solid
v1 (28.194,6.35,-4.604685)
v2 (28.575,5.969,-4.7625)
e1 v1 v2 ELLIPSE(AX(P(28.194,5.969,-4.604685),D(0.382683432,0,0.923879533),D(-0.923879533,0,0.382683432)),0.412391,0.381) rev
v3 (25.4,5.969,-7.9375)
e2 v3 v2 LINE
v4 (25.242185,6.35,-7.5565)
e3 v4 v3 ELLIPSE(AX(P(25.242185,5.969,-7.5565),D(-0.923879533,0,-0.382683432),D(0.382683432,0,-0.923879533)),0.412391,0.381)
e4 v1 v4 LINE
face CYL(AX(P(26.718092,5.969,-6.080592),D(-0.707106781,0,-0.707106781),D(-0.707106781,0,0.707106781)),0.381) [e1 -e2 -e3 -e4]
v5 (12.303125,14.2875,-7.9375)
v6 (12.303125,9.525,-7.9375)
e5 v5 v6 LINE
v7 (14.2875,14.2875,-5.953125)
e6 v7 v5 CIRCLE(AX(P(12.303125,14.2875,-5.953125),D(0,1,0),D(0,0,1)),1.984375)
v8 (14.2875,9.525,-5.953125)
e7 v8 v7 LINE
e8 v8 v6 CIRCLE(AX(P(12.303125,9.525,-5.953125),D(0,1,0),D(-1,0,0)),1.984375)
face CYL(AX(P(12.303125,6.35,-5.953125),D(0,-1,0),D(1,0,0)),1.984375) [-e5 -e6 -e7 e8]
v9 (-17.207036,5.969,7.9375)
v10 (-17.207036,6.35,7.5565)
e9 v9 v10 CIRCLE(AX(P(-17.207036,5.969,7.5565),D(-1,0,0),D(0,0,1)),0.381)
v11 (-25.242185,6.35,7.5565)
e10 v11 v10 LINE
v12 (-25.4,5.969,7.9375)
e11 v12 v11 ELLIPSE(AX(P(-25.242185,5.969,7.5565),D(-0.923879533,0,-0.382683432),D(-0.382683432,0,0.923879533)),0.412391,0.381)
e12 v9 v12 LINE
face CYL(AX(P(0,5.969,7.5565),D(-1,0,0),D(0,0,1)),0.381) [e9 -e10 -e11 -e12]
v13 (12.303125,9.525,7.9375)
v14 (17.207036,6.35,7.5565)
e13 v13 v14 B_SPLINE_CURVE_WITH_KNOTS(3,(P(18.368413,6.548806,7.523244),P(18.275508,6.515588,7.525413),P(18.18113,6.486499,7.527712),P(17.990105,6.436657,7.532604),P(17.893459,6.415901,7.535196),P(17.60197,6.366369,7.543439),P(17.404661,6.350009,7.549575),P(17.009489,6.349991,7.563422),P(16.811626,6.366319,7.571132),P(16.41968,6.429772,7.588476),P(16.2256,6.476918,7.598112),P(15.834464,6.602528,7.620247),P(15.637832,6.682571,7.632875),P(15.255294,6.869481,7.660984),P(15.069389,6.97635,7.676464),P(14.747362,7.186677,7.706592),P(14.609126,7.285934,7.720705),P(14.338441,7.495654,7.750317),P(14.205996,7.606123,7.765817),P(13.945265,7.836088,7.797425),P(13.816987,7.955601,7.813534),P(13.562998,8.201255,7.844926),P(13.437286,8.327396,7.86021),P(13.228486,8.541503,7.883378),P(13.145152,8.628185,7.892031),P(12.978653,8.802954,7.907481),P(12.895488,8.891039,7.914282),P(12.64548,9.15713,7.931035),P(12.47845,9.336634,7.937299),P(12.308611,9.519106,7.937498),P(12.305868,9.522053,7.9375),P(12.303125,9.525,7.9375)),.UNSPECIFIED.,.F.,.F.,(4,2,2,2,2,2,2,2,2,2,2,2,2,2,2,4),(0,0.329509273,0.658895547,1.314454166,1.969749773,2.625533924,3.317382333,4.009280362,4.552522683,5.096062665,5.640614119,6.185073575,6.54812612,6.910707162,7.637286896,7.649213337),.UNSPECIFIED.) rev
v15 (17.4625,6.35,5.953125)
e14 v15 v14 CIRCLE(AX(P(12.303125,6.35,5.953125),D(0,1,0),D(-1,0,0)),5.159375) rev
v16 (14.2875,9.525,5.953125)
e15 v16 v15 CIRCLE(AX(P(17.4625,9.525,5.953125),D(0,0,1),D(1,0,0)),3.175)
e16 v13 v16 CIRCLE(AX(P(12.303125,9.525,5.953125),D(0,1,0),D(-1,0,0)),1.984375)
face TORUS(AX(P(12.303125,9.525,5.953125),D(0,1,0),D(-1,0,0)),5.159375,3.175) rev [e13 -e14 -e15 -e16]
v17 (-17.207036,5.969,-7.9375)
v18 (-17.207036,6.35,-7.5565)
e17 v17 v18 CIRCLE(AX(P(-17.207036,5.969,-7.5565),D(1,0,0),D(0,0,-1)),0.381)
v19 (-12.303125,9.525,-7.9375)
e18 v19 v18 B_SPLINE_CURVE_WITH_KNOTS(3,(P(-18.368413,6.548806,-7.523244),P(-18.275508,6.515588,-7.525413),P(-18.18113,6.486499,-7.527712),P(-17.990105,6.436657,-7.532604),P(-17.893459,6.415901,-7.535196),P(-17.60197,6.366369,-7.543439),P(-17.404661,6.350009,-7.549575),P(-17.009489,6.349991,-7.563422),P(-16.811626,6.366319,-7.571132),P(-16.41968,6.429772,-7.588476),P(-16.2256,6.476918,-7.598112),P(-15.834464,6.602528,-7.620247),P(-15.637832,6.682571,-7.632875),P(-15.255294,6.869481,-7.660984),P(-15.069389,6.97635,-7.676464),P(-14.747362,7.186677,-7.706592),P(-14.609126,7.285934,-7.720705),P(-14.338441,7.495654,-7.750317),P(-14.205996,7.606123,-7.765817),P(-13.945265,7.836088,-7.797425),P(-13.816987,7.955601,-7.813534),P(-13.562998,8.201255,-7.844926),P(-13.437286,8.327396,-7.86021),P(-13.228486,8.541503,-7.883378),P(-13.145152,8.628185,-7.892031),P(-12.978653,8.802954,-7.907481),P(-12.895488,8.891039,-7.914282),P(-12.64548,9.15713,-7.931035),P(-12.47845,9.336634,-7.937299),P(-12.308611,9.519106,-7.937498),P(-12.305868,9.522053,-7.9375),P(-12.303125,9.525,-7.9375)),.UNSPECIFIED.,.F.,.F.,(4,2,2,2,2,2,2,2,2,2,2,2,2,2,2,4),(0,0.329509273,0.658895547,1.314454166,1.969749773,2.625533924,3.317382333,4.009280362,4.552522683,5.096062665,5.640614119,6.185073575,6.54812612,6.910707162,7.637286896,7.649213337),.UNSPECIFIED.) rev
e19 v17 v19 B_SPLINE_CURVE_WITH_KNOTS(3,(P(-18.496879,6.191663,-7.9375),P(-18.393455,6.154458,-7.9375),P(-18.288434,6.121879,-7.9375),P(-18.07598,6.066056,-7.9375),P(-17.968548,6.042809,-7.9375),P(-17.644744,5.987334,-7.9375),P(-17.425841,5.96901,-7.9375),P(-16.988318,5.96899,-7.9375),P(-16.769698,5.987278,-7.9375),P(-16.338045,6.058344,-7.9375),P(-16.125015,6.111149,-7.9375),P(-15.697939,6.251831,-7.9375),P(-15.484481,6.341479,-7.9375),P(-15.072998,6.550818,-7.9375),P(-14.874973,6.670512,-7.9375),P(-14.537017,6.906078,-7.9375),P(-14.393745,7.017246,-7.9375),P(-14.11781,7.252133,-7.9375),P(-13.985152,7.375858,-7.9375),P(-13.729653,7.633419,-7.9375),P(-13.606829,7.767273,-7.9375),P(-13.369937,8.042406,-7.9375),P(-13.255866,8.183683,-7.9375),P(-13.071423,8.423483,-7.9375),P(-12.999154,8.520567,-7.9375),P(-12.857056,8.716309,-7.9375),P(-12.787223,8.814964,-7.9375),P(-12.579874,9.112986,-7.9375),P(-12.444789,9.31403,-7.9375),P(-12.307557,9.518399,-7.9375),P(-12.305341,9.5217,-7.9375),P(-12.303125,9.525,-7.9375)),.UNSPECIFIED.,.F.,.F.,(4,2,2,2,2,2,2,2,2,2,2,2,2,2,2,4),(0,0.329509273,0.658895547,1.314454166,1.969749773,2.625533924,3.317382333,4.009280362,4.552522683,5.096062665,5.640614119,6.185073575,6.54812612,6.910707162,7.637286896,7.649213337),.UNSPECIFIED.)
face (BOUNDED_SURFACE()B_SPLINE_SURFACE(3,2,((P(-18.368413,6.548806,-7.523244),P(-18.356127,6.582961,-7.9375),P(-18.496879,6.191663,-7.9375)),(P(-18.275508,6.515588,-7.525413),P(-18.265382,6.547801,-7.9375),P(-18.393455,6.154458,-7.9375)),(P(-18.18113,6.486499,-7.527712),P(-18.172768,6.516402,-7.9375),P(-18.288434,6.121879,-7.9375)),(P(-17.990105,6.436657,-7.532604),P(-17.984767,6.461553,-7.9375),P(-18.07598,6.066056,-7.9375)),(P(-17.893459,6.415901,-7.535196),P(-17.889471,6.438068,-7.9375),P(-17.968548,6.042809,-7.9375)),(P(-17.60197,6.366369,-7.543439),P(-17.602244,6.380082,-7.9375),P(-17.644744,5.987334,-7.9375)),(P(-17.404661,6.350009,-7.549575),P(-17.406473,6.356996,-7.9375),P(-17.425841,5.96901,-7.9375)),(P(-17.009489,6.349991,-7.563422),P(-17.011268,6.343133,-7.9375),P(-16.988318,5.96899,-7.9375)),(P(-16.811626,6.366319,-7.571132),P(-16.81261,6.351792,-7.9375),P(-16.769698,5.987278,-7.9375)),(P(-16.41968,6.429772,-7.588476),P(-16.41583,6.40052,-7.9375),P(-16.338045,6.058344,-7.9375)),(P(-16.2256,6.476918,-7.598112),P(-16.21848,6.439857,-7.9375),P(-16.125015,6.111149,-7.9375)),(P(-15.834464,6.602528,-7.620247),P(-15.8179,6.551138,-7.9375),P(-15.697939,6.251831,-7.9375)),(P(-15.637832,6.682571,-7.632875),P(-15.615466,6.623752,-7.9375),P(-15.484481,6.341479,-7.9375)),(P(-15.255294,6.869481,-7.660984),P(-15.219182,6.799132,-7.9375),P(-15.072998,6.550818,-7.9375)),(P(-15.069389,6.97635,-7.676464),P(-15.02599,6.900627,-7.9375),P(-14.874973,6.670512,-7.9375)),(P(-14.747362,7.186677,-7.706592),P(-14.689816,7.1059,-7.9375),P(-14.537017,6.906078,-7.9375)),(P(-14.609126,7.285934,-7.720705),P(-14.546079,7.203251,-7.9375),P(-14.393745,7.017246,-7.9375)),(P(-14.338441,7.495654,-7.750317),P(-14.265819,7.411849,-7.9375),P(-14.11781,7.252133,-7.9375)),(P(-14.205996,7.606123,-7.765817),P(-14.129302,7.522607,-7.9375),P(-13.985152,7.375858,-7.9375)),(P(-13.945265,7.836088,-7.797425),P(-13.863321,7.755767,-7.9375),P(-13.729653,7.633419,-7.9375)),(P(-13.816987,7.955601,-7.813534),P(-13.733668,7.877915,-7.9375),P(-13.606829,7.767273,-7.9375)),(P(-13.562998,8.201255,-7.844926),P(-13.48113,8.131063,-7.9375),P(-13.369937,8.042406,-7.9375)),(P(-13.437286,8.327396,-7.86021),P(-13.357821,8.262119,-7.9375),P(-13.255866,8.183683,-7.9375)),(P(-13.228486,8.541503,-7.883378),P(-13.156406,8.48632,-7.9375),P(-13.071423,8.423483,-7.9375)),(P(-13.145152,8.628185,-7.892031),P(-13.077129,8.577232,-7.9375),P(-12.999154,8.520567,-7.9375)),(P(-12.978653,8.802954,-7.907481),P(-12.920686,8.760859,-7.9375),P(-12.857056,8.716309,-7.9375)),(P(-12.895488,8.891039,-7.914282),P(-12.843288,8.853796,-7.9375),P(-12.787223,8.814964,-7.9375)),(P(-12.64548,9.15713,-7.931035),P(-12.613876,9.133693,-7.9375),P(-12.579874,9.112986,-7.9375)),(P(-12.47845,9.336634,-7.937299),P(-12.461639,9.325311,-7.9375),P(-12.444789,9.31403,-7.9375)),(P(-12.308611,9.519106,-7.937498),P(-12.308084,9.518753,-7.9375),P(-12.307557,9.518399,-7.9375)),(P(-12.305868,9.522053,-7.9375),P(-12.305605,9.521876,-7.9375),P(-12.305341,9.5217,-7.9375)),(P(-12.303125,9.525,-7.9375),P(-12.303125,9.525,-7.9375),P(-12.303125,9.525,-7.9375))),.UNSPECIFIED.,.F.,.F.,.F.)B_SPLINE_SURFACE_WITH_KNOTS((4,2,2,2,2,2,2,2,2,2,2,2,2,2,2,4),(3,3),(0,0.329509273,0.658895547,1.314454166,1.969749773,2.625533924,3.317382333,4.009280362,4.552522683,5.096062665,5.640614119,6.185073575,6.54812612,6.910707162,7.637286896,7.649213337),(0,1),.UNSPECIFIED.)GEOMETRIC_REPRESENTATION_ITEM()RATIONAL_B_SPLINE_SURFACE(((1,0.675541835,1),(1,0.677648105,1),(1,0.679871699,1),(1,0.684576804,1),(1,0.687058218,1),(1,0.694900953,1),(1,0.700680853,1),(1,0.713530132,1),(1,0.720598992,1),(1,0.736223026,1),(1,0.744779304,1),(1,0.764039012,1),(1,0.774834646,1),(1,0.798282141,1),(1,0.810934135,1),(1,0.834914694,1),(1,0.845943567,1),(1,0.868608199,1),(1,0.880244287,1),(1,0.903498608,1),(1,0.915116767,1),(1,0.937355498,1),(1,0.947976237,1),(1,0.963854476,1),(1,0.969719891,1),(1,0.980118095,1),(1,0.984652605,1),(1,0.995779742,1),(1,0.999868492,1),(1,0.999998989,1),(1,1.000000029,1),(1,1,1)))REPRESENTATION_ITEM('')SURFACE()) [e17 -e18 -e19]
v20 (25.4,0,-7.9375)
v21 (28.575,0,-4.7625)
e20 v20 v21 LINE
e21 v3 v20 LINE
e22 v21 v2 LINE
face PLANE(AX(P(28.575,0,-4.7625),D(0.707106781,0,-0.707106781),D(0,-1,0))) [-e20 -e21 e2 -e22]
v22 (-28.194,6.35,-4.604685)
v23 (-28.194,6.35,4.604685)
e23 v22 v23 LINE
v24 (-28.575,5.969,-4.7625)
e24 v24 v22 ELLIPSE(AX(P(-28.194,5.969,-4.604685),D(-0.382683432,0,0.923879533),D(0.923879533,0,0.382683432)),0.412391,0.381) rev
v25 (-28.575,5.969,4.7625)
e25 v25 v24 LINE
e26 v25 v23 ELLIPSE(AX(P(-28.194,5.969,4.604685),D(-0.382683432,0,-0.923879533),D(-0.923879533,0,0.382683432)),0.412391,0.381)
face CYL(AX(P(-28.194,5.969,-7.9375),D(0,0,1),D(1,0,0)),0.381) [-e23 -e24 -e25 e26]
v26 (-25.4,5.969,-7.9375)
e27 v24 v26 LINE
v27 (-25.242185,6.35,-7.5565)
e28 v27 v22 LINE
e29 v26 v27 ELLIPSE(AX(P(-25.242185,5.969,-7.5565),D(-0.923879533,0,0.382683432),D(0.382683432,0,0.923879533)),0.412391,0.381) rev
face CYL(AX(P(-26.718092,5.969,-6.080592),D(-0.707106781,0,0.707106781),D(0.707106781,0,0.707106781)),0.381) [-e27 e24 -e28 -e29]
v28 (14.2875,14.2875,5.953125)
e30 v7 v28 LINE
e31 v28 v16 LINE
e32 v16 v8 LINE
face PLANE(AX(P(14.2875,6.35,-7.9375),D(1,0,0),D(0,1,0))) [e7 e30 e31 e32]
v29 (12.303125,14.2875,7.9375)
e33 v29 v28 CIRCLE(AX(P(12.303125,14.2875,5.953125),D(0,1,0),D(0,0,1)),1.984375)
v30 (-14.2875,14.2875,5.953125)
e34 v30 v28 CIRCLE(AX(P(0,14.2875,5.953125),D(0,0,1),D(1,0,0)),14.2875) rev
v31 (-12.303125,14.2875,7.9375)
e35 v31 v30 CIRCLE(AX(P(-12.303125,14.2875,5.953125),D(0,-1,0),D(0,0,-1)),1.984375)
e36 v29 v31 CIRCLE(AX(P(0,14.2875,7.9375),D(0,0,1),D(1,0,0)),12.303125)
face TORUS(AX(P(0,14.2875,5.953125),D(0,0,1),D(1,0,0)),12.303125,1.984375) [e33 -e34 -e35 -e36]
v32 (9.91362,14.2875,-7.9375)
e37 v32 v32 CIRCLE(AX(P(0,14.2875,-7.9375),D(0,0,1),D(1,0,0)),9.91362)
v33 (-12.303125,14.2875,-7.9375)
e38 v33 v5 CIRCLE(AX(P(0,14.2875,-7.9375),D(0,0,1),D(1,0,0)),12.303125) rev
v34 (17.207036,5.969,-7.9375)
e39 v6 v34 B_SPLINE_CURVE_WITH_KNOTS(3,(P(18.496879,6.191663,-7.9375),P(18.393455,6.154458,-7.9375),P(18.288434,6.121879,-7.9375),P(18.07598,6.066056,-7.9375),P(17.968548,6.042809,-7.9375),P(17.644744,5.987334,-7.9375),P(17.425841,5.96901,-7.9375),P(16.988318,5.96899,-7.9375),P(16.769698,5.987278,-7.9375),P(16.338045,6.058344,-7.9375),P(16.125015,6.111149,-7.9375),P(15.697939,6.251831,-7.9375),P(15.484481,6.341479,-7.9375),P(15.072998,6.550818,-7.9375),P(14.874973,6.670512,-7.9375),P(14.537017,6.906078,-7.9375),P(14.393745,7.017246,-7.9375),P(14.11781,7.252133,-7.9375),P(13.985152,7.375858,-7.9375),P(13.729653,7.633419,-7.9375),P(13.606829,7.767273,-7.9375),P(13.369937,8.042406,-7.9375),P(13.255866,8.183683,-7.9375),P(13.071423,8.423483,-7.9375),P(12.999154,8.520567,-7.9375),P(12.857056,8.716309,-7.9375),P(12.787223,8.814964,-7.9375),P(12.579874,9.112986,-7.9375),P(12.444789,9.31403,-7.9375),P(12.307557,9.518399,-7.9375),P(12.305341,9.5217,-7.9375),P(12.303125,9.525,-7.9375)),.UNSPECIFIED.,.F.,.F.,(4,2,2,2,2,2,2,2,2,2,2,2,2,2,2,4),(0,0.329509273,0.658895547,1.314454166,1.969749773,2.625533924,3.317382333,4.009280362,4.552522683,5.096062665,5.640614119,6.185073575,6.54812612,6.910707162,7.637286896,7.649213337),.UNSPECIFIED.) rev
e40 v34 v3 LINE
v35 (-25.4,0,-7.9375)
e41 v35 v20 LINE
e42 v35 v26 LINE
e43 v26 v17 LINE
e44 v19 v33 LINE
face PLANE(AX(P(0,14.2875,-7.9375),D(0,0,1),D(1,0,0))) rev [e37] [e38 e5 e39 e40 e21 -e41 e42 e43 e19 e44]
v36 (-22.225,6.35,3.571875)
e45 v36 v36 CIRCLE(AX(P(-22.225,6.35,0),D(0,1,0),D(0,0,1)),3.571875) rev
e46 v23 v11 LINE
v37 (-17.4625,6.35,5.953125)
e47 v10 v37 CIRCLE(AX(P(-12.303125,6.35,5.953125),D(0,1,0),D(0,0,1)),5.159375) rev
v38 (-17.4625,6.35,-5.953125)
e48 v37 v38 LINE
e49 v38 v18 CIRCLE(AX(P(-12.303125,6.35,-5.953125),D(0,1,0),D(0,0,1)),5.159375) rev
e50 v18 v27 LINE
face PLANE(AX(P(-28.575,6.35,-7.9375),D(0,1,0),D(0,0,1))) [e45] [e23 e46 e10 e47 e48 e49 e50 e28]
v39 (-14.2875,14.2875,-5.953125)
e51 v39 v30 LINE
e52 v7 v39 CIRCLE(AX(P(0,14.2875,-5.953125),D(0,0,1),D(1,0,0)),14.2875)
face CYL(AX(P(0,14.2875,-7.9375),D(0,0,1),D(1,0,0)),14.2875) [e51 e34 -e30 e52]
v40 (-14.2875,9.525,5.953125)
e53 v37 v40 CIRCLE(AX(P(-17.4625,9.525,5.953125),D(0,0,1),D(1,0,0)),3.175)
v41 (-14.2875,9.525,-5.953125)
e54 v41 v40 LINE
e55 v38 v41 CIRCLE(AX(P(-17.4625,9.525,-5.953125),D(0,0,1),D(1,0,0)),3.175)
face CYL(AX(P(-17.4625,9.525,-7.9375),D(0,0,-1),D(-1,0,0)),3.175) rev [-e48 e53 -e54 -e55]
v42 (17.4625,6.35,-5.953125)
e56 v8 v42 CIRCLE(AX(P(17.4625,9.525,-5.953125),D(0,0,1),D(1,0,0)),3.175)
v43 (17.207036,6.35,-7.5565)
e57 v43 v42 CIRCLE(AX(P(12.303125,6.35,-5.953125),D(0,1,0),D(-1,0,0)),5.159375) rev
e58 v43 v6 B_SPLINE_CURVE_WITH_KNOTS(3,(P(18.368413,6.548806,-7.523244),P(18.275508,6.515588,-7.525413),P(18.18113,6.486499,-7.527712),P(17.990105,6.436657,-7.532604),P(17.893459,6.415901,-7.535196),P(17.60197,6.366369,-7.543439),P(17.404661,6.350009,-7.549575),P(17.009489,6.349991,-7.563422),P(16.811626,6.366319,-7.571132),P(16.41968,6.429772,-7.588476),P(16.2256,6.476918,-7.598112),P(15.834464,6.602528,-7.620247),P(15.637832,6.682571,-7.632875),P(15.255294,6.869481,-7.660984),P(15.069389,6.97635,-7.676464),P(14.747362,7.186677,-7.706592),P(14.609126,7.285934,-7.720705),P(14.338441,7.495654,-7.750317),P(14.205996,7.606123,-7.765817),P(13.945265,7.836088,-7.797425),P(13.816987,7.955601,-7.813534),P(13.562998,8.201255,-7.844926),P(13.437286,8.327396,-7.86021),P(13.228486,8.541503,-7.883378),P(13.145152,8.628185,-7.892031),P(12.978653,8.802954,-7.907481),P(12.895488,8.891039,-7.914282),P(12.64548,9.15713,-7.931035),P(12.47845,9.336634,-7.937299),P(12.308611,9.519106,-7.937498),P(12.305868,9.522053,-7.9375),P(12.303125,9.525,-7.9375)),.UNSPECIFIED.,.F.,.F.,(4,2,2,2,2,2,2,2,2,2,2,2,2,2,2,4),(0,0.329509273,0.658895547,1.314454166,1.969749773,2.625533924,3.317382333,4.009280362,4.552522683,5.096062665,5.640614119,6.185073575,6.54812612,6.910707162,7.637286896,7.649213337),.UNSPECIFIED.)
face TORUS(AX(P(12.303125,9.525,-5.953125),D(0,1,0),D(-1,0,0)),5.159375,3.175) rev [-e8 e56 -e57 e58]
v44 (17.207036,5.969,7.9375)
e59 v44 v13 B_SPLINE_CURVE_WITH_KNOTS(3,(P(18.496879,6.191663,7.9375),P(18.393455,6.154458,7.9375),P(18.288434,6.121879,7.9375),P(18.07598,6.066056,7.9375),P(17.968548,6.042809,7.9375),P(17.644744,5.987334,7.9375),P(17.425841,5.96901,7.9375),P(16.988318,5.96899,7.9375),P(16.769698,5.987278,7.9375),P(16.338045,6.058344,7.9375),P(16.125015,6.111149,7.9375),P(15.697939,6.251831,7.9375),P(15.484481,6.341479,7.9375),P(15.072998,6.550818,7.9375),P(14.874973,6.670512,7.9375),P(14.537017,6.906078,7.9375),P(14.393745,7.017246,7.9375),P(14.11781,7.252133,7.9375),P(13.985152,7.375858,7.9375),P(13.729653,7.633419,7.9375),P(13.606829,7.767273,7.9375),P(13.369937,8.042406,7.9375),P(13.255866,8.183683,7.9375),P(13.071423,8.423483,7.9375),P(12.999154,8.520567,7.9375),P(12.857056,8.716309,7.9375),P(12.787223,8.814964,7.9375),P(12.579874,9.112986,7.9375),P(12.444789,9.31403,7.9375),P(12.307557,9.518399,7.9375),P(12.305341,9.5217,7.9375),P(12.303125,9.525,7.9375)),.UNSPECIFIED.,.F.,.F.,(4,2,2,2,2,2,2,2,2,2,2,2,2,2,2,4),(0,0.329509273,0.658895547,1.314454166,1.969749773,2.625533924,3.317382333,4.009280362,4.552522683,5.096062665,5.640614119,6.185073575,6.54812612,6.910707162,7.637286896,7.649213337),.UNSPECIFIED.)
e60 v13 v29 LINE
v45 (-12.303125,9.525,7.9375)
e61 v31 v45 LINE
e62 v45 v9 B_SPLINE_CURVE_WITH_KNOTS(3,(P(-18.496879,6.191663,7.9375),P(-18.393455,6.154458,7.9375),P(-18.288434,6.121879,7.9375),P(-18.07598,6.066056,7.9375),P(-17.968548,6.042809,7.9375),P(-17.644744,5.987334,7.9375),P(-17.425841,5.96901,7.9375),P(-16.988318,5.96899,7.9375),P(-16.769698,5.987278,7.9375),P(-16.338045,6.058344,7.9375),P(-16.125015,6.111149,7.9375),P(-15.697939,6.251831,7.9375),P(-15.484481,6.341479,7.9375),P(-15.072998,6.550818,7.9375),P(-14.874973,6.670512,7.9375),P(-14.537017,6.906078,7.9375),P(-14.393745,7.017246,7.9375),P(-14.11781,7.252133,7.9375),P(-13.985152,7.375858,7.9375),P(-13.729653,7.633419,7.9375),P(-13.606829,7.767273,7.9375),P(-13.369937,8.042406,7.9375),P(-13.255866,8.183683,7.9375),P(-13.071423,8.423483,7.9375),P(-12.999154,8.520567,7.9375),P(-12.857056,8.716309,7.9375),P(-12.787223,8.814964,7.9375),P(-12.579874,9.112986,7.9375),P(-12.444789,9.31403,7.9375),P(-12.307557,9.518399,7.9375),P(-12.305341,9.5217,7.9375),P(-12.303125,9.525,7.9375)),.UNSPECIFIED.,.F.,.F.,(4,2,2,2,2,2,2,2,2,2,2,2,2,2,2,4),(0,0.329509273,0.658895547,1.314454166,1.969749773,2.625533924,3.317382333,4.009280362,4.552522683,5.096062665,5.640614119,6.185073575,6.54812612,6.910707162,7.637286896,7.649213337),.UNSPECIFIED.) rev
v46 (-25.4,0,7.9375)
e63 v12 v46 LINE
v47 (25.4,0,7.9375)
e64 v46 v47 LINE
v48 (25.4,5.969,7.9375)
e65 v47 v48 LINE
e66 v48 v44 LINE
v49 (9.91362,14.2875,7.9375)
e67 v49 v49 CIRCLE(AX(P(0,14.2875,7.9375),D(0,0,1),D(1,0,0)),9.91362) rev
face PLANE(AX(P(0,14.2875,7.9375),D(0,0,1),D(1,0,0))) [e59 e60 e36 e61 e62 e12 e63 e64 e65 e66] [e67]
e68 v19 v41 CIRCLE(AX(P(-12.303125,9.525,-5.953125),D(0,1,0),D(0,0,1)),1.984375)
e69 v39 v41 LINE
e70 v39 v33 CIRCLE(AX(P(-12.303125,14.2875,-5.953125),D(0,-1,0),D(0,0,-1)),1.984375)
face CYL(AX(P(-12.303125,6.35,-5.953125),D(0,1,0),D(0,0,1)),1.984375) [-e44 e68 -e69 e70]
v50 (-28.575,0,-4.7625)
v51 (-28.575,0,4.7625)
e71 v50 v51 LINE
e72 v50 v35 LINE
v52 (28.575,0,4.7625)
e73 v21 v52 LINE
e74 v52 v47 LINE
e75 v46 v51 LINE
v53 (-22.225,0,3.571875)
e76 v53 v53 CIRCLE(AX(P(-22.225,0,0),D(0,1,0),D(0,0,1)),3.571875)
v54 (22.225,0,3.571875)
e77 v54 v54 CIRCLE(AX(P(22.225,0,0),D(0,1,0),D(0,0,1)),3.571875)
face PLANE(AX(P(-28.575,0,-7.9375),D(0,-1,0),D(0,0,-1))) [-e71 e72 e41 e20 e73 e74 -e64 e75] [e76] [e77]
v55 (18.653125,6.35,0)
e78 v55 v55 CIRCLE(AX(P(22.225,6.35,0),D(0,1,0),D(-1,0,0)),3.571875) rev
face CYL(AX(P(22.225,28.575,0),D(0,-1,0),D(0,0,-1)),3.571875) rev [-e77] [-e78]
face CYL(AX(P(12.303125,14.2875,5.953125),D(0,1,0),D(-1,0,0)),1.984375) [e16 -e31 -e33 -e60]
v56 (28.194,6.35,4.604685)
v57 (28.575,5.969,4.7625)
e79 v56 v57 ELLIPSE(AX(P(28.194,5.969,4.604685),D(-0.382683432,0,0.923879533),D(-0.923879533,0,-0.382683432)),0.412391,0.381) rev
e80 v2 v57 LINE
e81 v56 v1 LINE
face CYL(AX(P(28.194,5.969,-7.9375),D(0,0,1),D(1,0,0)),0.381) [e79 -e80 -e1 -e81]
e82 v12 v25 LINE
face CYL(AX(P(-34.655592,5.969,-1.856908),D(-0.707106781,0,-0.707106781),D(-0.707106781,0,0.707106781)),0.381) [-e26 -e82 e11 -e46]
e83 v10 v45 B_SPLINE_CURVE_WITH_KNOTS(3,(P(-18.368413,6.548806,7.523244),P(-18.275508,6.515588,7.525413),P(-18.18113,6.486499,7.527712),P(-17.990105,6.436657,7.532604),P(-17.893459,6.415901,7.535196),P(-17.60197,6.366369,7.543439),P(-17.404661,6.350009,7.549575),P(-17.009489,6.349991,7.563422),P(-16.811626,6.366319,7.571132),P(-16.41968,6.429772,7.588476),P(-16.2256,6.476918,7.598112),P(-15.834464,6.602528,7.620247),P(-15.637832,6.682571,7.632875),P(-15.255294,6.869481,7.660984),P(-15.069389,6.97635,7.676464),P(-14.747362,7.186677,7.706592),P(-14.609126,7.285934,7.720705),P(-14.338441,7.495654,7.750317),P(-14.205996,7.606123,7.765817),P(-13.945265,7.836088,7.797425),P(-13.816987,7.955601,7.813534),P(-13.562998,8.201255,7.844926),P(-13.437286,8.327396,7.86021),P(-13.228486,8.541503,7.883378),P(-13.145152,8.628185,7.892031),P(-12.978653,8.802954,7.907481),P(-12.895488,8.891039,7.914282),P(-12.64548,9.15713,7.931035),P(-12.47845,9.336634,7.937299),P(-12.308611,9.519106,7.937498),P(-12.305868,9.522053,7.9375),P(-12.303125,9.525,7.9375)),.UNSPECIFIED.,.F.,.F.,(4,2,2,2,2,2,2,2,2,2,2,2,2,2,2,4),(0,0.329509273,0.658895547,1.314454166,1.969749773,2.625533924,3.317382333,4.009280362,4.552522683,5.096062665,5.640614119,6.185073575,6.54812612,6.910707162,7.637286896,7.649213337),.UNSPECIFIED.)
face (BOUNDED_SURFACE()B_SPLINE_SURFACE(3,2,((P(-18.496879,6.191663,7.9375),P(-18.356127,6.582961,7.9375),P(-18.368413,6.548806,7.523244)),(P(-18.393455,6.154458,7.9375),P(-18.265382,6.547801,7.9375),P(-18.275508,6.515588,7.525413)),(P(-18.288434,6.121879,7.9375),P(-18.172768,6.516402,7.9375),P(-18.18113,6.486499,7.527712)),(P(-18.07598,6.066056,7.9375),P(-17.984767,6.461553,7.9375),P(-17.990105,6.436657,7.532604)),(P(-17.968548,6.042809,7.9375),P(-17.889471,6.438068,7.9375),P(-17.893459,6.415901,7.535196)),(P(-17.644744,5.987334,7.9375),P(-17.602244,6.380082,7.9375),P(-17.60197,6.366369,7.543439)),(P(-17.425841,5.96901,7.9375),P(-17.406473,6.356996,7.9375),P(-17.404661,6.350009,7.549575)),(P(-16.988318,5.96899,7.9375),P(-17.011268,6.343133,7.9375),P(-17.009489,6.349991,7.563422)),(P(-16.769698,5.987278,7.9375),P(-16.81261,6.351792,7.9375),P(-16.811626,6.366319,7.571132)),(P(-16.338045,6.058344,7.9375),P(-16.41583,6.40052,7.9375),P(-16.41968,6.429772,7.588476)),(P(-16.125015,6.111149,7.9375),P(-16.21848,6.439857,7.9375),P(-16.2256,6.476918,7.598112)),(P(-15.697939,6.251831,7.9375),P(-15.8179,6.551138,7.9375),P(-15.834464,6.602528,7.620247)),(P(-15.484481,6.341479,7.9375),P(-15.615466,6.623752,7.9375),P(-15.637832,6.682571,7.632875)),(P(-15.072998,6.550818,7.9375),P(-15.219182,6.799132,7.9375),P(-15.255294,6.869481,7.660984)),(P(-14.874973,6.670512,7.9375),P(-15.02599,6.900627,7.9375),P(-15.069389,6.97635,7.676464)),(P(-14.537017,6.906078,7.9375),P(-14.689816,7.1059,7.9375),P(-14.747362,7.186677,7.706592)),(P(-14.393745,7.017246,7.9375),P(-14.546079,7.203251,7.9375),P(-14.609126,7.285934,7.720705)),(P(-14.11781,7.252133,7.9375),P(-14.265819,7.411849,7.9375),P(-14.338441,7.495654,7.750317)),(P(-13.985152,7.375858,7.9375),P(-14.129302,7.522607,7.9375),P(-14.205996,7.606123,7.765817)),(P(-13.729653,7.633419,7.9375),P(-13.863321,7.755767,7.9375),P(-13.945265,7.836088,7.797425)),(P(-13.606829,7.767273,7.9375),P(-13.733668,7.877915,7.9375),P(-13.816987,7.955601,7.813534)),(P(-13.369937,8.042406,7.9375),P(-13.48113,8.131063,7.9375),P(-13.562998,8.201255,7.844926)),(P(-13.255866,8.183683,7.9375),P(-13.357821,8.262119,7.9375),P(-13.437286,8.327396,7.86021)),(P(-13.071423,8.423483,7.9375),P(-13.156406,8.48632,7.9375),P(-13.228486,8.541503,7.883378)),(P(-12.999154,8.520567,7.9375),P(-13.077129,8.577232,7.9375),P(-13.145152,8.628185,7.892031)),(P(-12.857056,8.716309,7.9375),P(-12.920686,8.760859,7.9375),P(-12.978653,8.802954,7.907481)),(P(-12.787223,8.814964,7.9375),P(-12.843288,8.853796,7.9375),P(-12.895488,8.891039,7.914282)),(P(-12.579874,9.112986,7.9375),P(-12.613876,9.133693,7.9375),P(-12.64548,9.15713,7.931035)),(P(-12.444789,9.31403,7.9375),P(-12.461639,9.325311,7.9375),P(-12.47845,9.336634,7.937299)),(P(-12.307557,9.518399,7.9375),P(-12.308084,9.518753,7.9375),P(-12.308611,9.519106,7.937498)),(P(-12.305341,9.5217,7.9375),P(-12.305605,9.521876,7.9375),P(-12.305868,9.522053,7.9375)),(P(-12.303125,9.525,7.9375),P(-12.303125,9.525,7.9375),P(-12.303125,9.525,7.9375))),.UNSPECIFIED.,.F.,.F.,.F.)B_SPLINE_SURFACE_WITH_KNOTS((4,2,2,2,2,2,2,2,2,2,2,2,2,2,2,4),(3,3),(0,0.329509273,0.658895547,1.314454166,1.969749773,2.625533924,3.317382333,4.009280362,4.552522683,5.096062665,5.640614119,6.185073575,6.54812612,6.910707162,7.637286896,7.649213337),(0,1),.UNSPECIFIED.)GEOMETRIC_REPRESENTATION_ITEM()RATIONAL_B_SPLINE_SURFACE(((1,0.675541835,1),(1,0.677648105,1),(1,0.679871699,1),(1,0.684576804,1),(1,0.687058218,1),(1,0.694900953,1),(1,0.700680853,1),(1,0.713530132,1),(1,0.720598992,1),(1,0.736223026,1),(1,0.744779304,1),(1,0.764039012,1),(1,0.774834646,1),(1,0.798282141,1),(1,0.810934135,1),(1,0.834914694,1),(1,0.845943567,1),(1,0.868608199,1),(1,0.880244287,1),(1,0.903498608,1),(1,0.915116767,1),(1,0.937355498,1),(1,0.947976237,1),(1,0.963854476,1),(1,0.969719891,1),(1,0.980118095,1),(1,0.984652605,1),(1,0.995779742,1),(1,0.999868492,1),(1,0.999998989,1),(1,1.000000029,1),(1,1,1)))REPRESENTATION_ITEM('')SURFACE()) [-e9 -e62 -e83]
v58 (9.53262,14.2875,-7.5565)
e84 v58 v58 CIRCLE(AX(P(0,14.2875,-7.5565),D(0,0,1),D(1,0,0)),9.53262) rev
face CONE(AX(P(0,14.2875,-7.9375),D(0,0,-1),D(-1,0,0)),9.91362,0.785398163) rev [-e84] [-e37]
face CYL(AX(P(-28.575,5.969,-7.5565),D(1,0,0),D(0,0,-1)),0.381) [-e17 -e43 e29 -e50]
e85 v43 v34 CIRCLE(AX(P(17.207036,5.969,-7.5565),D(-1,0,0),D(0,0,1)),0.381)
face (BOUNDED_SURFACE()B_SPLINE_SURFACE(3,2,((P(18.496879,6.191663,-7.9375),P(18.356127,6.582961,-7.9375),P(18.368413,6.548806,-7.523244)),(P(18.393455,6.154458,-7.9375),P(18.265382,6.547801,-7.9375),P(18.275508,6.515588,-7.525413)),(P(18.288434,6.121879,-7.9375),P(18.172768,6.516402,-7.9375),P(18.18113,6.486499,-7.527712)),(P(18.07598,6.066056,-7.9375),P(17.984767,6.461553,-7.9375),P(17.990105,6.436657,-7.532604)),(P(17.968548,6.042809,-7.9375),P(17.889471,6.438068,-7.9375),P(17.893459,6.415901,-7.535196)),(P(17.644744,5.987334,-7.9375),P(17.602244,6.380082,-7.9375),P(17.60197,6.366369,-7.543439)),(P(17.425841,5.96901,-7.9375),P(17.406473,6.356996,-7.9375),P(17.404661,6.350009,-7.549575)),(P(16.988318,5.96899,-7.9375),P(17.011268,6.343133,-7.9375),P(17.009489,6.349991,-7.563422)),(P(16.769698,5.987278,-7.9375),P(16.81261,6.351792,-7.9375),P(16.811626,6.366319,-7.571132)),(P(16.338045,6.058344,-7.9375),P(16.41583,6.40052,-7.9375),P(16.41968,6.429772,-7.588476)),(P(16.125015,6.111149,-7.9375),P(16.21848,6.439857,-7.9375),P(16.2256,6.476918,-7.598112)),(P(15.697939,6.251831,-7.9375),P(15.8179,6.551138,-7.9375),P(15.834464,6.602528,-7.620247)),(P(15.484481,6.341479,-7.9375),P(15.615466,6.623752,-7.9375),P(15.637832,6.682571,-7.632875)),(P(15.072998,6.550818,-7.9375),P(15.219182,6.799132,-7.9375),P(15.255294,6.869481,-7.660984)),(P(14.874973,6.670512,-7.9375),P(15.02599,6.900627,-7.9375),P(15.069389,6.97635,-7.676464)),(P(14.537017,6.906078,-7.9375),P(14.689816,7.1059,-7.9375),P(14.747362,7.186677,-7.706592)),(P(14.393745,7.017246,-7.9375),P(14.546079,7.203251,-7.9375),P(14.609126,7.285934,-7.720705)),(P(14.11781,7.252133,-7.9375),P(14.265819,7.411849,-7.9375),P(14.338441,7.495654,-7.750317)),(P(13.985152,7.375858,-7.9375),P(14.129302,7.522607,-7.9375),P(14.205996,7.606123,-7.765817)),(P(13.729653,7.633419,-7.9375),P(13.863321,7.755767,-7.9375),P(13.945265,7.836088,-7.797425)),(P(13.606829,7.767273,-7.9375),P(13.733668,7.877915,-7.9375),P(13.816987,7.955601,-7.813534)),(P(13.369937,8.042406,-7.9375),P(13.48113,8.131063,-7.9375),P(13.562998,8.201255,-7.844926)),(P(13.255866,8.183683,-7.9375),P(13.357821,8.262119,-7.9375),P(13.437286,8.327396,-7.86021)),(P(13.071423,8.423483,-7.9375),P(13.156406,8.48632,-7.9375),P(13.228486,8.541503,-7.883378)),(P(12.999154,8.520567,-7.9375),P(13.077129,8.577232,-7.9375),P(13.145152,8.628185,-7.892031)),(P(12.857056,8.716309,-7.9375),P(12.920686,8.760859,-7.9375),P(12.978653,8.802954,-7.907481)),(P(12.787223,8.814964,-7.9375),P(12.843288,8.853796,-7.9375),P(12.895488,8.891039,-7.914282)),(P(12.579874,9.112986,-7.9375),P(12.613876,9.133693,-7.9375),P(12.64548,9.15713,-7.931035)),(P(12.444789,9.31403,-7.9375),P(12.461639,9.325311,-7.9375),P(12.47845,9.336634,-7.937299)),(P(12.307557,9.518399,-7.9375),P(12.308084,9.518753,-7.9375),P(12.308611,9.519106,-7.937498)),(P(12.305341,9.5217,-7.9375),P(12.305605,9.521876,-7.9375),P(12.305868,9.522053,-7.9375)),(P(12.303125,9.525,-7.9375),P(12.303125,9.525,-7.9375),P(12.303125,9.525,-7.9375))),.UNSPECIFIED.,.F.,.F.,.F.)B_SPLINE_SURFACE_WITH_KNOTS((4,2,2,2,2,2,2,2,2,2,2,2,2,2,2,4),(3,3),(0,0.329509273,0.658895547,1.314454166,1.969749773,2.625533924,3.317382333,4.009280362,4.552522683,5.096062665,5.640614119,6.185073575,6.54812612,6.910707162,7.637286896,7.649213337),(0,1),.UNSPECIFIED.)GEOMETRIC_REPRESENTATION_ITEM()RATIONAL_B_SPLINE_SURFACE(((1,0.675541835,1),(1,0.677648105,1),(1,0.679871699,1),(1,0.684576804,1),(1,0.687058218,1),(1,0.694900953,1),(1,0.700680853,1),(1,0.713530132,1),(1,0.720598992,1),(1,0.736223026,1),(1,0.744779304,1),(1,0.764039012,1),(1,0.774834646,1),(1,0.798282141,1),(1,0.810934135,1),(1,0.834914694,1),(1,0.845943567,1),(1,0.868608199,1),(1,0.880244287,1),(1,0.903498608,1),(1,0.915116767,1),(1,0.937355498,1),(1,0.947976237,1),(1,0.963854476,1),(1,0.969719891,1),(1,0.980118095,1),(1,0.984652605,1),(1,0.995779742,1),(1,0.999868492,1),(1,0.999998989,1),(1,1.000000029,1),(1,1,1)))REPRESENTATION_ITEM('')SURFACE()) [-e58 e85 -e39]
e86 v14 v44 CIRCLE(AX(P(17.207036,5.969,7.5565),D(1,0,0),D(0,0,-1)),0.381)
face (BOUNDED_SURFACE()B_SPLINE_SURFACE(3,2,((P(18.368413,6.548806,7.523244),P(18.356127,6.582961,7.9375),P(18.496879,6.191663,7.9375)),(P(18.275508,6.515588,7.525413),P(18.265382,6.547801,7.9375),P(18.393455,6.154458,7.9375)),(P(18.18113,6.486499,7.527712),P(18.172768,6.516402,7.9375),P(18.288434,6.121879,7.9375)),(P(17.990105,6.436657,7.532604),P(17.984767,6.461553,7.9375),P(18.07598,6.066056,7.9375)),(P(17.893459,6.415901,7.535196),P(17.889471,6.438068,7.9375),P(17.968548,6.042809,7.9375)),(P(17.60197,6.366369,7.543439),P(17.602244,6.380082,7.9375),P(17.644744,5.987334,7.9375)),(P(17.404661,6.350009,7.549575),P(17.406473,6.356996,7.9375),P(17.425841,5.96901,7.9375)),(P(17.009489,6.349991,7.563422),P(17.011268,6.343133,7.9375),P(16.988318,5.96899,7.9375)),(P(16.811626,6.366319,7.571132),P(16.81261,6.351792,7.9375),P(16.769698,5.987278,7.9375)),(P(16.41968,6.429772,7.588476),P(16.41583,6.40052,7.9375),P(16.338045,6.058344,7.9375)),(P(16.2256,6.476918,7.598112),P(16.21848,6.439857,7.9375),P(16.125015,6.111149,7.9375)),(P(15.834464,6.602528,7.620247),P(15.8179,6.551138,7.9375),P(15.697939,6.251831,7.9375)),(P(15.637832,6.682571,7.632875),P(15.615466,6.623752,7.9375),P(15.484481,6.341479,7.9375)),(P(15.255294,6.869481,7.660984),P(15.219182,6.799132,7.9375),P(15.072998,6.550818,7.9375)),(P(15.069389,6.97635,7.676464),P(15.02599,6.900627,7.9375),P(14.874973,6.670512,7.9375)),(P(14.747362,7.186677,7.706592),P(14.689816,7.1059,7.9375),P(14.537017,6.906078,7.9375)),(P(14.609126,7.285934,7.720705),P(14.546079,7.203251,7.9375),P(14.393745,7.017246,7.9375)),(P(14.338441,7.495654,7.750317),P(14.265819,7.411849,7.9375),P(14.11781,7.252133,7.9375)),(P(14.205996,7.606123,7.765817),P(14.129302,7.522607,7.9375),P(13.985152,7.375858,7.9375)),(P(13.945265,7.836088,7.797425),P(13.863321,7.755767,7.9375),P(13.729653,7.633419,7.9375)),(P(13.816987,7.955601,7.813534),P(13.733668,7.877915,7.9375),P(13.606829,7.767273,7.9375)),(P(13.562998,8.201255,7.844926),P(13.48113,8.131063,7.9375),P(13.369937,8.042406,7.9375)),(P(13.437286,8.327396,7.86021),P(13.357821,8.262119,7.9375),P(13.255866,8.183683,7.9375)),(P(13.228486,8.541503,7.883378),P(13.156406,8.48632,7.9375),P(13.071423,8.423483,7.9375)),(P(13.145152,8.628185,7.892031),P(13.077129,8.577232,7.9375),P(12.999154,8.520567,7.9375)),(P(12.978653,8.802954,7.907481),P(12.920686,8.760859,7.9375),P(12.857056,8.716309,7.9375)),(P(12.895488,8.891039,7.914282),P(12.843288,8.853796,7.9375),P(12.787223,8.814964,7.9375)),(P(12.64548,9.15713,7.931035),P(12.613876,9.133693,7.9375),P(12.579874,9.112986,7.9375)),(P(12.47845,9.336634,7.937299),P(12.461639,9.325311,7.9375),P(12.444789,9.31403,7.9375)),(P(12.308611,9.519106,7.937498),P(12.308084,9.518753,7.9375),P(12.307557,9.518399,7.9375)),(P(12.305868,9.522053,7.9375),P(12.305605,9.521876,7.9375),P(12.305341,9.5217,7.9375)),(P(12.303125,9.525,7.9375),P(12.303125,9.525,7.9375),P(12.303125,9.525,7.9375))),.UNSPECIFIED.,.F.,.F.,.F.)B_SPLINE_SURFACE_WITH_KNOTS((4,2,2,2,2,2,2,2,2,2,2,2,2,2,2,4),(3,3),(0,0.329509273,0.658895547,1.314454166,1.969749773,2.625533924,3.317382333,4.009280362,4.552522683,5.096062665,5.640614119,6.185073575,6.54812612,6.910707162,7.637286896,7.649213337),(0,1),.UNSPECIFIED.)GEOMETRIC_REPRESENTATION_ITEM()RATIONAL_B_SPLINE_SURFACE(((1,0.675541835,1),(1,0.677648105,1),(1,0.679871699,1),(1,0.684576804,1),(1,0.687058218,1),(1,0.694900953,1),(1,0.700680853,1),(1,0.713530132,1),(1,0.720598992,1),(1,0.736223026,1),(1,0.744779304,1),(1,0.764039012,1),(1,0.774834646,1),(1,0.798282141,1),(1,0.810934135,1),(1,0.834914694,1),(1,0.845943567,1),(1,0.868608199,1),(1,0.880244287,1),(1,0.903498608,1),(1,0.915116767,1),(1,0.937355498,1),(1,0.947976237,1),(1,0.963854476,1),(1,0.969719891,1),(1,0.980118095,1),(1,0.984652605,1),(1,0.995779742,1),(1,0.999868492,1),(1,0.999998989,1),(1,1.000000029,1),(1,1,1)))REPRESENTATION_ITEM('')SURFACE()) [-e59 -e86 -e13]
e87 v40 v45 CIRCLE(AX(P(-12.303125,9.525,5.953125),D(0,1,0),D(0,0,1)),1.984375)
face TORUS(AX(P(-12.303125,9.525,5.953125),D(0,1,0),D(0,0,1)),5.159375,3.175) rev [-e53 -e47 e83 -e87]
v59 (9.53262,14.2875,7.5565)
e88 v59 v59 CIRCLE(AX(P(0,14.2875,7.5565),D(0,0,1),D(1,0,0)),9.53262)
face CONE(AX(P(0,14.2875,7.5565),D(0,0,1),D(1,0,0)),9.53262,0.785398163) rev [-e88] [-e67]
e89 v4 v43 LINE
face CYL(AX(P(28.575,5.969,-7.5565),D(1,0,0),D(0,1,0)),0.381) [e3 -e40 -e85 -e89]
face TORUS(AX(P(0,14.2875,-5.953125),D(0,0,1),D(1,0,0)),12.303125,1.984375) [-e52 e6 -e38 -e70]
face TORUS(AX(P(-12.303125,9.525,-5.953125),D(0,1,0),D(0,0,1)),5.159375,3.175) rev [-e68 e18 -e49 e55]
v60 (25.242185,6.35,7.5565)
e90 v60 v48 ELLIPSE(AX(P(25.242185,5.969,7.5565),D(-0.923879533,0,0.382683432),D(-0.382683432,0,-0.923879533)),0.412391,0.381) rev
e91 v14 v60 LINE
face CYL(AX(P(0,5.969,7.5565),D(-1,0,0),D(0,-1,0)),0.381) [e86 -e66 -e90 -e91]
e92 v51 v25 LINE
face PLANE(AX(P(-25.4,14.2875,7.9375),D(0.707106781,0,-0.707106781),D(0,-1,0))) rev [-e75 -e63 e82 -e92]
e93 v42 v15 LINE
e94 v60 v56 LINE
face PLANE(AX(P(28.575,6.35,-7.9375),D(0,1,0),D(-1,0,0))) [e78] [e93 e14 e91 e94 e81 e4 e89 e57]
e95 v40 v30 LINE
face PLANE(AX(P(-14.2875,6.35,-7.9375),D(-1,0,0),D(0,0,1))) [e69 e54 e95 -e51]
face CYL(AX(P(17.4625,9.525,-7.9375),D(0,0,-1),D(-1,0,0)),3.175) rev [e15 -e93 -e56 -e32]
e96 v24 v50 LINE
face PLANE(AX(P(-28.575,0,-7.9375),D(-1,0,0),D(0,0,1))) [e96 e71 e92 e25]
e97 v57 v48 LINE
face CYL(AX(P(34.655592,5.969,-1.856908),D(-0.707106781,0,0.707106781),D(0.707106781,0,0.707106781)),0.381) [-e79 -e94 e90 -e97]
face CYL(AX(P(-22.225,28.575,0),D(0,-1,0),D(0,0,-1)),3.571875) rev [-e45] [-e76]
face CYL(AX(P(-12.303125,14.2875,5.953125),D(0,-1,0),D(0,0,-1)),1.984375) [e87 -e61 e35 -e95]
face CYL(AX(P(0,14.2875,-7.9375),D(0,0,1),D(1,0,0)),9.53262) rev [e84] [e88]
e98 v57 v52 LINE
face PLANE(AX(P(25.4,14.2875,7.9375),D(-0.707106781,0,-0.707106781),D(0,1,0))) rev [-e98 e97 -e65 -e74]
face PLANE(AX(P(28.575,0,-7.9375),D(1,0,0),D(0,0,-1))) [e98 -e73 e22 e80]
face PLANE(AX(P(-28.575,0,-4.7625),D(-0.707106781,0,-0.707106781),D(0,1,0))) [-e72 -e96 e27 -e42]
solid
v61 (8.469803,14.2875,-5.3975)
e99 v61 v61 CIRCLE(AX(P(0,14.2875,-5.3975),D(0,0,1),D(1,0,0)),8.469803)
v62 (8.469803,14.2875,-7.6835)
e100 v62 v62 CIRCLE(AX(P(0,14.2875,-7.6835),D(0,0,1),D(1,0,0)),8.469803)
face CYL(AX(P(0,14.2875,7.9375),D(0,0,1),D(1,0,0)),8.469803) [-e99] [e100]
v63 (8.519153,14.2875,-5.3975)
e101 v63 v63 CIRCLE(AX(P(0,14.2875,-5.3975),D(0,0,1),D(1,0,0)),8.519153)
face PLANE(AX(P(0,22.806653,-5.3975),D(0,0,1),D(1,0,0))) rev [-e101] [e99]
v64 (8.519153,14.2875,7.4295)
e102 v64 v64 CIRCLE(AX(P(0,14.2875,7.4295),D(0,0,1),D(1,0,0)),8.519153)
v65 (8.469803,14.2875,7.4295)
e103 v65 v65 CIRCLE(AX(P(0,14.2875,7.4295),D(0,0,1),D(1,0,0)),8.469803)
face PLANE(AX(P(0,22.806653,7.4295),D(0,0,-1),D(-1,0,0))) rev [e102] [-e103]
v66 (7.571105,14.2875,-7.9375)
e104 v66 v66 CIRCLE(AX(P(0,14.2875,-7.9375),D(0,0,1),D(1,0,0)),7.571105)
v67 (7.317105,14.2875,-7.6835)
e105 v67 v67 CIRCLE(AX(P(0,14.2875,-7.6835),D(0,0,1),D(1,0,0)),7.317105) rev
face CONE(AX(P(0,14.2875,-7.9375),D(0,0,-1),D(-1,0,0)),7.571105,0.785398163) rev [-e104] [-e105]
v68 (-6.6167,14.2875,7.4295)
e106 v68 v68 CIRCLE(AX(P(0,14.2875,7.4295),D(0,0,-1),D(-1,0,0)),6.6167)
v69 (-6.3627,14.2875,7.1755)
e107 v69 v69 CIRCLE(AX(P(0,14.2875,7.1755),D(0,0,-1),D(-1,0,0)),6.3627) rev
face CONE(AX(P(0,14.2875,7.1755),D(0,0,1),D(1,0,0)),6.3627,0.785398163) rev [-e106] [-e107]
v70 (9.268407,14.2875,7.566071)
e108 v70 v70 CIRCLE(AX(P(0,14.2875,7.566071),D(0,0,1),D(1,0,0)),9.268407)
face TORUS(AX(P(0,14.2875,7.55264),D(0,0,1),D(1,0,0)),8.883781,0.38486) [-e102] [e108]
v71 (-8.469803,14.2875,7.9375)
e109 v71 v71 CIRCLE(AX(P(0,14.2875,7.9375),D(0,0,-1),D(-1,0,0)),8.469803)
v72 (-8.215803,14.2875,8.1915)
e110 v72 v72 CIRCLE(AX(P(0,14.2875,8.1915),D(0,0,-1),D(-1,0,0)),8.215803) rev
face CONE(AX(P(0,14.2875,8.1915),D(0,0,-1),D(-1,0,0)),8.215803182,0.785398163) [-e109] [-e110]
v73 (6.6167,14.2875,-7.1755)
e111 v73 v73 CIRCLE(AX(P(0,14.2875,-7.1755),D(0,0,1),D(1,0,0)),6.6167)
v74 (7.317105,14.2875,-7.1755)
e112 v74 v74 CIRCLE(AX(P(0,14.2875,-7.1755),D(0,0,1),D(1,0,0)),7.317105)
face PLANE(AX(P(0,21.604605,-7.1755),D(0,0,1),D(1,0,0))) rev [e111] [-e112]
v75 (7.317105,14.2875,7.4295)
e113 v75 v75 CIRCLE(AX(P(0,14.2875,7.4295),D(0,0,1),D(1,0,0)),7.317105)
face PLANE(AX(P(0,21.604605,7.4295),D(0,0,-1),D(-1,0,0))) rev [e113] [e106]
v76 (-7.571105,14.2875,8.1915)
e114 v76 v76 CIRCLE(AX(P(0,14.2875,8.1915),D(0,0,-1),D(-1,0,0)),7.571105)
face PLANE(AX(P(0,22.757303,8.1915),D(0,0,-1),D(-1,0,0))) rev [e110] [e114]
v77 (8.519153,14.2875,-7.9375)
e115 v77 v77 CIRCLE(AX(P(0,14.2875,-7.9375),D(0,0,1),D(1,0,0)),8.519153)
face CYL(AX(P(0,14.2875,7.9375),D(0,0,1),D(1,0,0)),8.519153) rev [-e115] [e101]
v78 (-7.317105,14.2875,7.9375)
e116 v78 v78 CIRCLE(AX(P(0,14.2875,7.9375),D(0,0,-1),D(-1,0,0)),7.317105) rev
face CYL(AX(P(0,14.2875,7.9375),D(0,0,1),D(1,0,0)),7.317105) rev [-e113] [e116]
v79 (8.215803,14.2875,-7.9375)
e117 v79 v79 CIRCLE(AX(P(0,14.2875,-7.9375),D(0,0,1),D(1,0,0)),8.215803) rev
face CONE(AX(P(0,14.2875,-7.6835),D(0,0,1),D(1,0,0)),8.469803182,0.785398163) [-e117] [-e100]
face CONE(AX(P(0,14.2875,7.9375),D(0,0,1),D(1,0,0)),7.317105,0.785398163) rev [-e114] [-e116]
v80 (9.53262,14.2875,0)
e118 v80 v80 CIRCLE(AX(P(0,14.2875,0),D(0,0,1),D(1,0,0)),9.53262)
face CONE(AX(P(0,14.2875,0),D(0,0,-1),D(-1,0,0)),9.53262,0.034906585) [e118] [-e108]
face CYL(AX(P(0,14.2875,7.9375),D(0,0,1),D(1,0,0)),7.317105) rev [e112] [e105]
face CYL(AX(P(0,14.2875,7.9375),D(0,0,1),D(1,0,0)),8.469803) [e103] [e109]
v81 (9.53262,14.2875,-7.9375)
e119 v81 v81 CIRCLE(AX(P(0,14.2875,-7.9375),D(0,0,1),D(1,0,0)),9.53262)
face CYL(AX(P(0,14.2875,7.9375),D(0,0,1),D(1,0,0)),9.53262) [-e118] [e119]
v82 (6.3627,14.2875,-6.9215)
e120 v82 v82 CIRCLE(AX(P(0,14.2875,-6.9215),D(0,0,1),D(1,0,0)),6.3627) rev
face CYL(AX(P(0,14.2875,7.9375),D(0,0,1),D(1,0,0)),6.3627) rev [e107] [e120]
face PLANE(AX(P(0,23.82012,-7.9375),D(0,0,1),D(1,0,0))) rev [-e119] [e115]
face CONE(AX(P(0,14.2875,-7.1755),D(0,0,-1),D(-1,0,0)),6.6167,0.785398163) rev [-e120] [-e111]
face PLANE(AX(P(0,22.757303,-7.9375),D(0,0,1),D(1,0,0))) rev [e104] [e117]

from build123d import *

# Parameters (mm, degrees)
BOSS_EXTRUDE1_DEPTH      = 7.9375
BOSS_EXTRUDE1_DEPTH_BACK = 7.9375
SKETCH3_R                = 9.53262
SKETCH4_R                = 3.571875
CUT_EXTRUDE1_DEPTH       = 42.183311623
CHAMFER1_SIZE            = 3.175
FILLET1_R                = 1.984375
FILLET2_R                = 3.175
CHAMFER2_SIZE            = 0.381
FILLET3_R                = 0.381
CHAMFER3_SIZE            = 0.254


with BuildPart() as part:
    # Sketch3 → Boss-Extrude1 (new, two sides: drawn at the far end of the back side and taken through both)
    with BuildSketch(Plane.XY.offset(-BOSS_EXTRUDE1_DEPTH_BACK)):
        with BuildLine():
            Line((-28.575, 0), (-28.575, 6.35))
            Line((-28.575, 6.35), (-14.2875, 6.35))
            Line((-14.2875, 6.35), (-14.2875, 14.2875))
            ThreePointArc((-14.2875, 14.2875), (0, 28.575), (14.2875, 14.2875))
            Line((14.2875, 14.2875), (14.2875, 6.35))
            Line((14.2875, 6.35), (28.575, 6.35))
            Line((28.575, 6.35), (28.575, 0))
            Line((28.575, 0), (-28.575, 0))
        make_face()
        with Locations((0, 14.2875)):
            Circle(SKETCH3_R, mode=Mode.SUBTRACT)
    extrude(amount=BOSS_EXTRUDE1_DEPTH + BOSS_EXTRUDE1_DEPTH_BACK)

    # Sketch4 → Cut-Extrude1 (cut, through all)
    with BuildSketch(Plane(origin=(0, 0, 0), x_dir=(1, 0, 0), z_dir=(0, 1, 0))):
        with Locations(Location((-22.225, 0, 0), (0, 0, 270))):
            Circle(SKETCH4_R)
        with Locations(Location((22.225, 0, 0), (0, 0, 180))):
            Circle(SKETCH4_R)
    extrude(amount=CUT_EXTRUDE1_DEPTH, mode=Mode.SUBTRACT)

    # Chamfer1
    chamfer1_edges = [part.edges().sort_by_distance(p)[0] for p in [
        (28.575, 3.175, 7.9375),
        (-28.575, 3.175, -7.9375),
        (-28.575, 3.175, 7.9375),
        (28.575, 3.175, -7.9375),
    ]]
    chamfer(chamfer1_edges, length=CHAMFER1_SIZE)

    # Fillet1
    fillet1_edges = [part.edges().sort_by_distance(p)[0] for p in [
        (14.2875, 10.31875, -7.9375),
        (0, 28.575, -7.9375),
        (-14.2875, 10.31875, -7.9375),
        (14.2875, 10.31875, 7.9375),
        (0, 28.575, 7.9375),
        (-14.2875, 10.31875, 7.9375),
    ]]
    fillet(fillet1_edges, radius=FILLET1_R)

    # Fillet2
    # the kernel refuses this fillet: 3.175 mm, written as the material it adds along each edge
    with BuildSketch(Plane(origin=(-14.2875, 6.35, 5.953125), x_dir=(-1, 0, 0), z_dir=(0, 0, -1))) as fillet2_piece_1:
        with BuildLine():
            CenterArc((FILLET2_R, FILLET2_R), FILLET2_R, 180, 90)
            Line((0, FILLET2_R), (0, 0))
            Line((0, 0), (FILLET2_R, 0))
        make_face()
    extrude(amount=11.90625)
    with BuildSketch(Plane(origin=(14.2875, 6.35, 5.953125), x_dir=(1, 0, 0), z_dir=(0, 0, -1))) as fillet2_piece_2:
        with BuildLine():
            CenterArc((FILLET2_R, -FILLET2_R), FILLET2_R, 90, 90)
            Line((0, -FILLET2_R), (0, 0))
            Line((0, 0), (FILLET2_R, 0))
        make_face()
    extrude(amount=11.90625)
    with BuildSketch(Plane(origin=(-12.303125, 6.35, -5.953125), x_dir=(-0.7578518137495754, 0, 0.6524267226259811), z_dir=(-0.6524267226259811, 0, -0.7578518137495754))) as fillet2_piece_3_section:
        with BuildLine():
            CenterArc((-1.984375 - FILLET2_R, FILLET2_R), FILLET2_R, 270, 90)
            Line((-1.984375, FILLET2_R), (-1.984375, 0))
            Line((-1.984375, 0), (-1.984375 - FILLET2_R, 0))
        make_face()
    fillet2_piece_3 = revolve(axis=Axis((-12.303125, 6.35, -5.953125), (0, 1, 0)), revolution_arc=319.27518278, mode=Mode.PRIVATE)
    fillet2_piece_3 = split(fillet2_piece_3, bisect_by=Plane(origin=(-13.806400023, 7.435141172, -7.9375), z_dir=(0, 0, 1)), keep=Keep.TOP, mode=Mode.PRIVATE)
    add(fillet2_piece_3)
    with BuildSketch(Plane(origin=(-12.303125, 6.35, 5.953125), x_dir=(-0.7578518137495754, 0, -0.6524267226259811), z_dir=(-0.6524267226259811, 0, 0.7578518137495754))) as fillet2_piece_4_section:
        with BuildLine():
            CenterArc((-1.984375 - FILLET2_R, -FILLET2_R), FILLET2_R, 0, 90)
            Line((-1.984375, -FILLET2_R), (-1.984375, 0))
            Line((-1.984375, 0), (-1.984375 - FILLET2_R, 0))
        make_face()
    fillet2_piece_4 = revolve(axis=Axis((-12.303125, 6.35, 5.953125), (0, -1, 0)), revolution_arc=319.27518278, mode=Mode.PRIVATE)
    fillet2_piece_4 = split(fillet2_piece_4, bisect_by=Plane(origin=(-13.806400023, 7.435141172, 7.9375), z_dir=(0, 0, -1)), keep=Keep.TOP, mode=Mode.PRIVATE)
    add(fillet2_piece_4)
    with BuildSketch(Plane(origin=(12.303125, 6.35, -5.953125), x_dir=(0.7578518137495768, 0, 0.6524267226259794), z_dir=(0.6524267226259794, 0, -0.7578518137495768))) as fillet2_piece_5_section:
        with BuildLine():
            CenterArc((-1.984375 - FILLET2_R, -FILLET2_R), FILLET2_R, 360, 90)
            Line((-1.984375, -FILLET2_R), (-1.984375, 0))
            Line((-1.984375, 0), (-1.984375 - FILLET2_R, 0))
        make_face()
    fillet2_piece_5 = revolve(axis=Axis((12.303125, 6.35, -5.953125), (0, -1, 0)), revolution_arc=319.27518278, mode=Mode.PRIVATE)
    fillet2_piece_5 = split(fillet2_piece_5, bisect_by=Plane(origin=(13.8064, 7.435141487, -7.9375), z_dir=(0, 0, 1)), keep=Keep.TOP, mode=Mode.PRIVATE)
    add(fillet2_piece_5)
    with BuildSketch(Plane(origin=(12.303125, 6.35, 5.953125), x_dir=(0.7578518137495768, 0, -0.6524267226259794), z_dir=(0.6524267226259794, 0, 0.7578518137495768))) as fillet2_piece_6_section:
        with BuildLine():
            CenterArc((-1.984375 - FILLET2_R, FILLET2_R), FILLET2_R, 270, 90)
            Line((-1.984375, FILLET2_R), (-1.984375, 0))
            Line((-1.984375, 0), (-1.984375 - FILLET2_R, 0))
        make_face()
    fillet2_piece_6 = revolve(axis=Axis((12.303125, 6.35, 5.953125), (0, 1, 0)), revolution_arc=319.27518278, mode=Mode.PRIVATE)
    fillet2_piece_6 = split(fillet2_piece_6, bisect_by=Plane(origin=(13.8064, 7.435141487, 7.9375), z_dir=(0, 0, -1)), keep=Keep.TOP, mode=Mode.PRIVATE)
    add(fillet2_piece_6)

    # Chamfer2
    chamfer2_edges = [part.edges().sort_by_distance(p)[0] for p in [
        (-9.53262, 14.2875, -7.9375),
        (-9.53262, 14.2875, 7.9375),
    ]]
    chamfer(chamfer2_edges, length=CHAMFER2_SIZE)

    # Fillet3
    fillet3_edges = [part.edges().sort_by_distance(p)[0] for p in [
        (-21.2328125, 6.35, -7.9375),
        (-21.2328125, 6.35, 7.9375),
        (-14.328484078, 7.361660922, -7.9375),
        (-14.328484078, 7.361660922, 7.9375),
        (14.328484078, 7.361660922, -7.9375),
        (14.328484078, 7.361660922, 7.9375),
        (-28.575, 6.35, 0),
        (21.2328125, 6.35, -7.9375),
        (-26.9875, 6.35, 6.35),
        (-26.9875, 6.35, -6.35),
        (21.2328125, 6.35, 7.9375),
        (28.575, 6.35, 0),
        (26.9875, 6.35, -6.35),
        (26.9875, 6.35, 6.35),
    ]]
    fillet(fillet3_edges, radius=FILLET3_R)


with BuildPart() as body_2:
    # Sketch6 → Revolve1 (revolve)
    with BuildSketch(Plane(origin=(0, 0, 0), x_dir=(0, 0, -1), z_dir=(1, 0, 0)), mode=Mode.PRIVATE) as revolve1_sk:
        with BuildLine():
            Line((0, 23.82012), (7.9375, 23.82012))
            Line((7.9375, 23.82012), (7.9375, 22.806653146))
            Line((7.9375, 22.806653146), (5.3975, 22.806653146))
            Line((5.3975, 22.806653146), (5.3975, 22.757303182))
            Line((5.3975, 22.757303182), (7.9375, 22.757303182))
            Line((7.9375, 22.757303182), (7.9375, 21.604605))
            Line((7.9375, 21.604605), (7.1755, 21.604605))
            Line((7.1755, 21.604605), (7.1755, 20.6502))
            Line((7.1755, 20.6502), (-7.4295, 20.6502))
            Line((-7.4295, 20.6502), (-7.4295, 21.604605))
            Line((-7.4295, 21.604605), (-8.1915, 21.604605))
            Line((-8.1915, 21.604605), (-8.1915, 22.757303182))
            Line((-8.1915, 22.757303182), (-7.4295, 22.757303182))
            Line((-7.4295, 22.757303182), (-7.4295, 22.806653146))
            ThreePointArc((-7.4295, 22.806653146), (-7.931261591, 23.102267559), (-7.566071414, 23.555906964))
            Line((-7.566071414, 23.555906964), (0, 23.82012))
        make_face()
    revolve(revolve1_sk.sketch.rotate(Axis((0, 14.2875, 7.9375), (0, 0, -1)), 90), axis=Axis((0, 14.2875, 7.9375), (0, 0, -1)))

    # Chamfer3
    chamfer3_edges = [body_2.edges().sort_by_distance(p)[0] for p in [
        (-8.469803182, 14.2875, -7.9375),
        (-7.317105, 14.2875, -7.9375),
        (-6.3627, 14.2875, -7.1755),
        (-6.3627, 14.2875, 7.4295),
        (-7.317105, 14.2875, 8.1915),
        (-8.469803182, 14.2875, 8.1915),
    ]]
    chamfer(chamfer3_edges, length=CHAMFER3_SIZE)


solid = Compound([part.part, body_2.part])
